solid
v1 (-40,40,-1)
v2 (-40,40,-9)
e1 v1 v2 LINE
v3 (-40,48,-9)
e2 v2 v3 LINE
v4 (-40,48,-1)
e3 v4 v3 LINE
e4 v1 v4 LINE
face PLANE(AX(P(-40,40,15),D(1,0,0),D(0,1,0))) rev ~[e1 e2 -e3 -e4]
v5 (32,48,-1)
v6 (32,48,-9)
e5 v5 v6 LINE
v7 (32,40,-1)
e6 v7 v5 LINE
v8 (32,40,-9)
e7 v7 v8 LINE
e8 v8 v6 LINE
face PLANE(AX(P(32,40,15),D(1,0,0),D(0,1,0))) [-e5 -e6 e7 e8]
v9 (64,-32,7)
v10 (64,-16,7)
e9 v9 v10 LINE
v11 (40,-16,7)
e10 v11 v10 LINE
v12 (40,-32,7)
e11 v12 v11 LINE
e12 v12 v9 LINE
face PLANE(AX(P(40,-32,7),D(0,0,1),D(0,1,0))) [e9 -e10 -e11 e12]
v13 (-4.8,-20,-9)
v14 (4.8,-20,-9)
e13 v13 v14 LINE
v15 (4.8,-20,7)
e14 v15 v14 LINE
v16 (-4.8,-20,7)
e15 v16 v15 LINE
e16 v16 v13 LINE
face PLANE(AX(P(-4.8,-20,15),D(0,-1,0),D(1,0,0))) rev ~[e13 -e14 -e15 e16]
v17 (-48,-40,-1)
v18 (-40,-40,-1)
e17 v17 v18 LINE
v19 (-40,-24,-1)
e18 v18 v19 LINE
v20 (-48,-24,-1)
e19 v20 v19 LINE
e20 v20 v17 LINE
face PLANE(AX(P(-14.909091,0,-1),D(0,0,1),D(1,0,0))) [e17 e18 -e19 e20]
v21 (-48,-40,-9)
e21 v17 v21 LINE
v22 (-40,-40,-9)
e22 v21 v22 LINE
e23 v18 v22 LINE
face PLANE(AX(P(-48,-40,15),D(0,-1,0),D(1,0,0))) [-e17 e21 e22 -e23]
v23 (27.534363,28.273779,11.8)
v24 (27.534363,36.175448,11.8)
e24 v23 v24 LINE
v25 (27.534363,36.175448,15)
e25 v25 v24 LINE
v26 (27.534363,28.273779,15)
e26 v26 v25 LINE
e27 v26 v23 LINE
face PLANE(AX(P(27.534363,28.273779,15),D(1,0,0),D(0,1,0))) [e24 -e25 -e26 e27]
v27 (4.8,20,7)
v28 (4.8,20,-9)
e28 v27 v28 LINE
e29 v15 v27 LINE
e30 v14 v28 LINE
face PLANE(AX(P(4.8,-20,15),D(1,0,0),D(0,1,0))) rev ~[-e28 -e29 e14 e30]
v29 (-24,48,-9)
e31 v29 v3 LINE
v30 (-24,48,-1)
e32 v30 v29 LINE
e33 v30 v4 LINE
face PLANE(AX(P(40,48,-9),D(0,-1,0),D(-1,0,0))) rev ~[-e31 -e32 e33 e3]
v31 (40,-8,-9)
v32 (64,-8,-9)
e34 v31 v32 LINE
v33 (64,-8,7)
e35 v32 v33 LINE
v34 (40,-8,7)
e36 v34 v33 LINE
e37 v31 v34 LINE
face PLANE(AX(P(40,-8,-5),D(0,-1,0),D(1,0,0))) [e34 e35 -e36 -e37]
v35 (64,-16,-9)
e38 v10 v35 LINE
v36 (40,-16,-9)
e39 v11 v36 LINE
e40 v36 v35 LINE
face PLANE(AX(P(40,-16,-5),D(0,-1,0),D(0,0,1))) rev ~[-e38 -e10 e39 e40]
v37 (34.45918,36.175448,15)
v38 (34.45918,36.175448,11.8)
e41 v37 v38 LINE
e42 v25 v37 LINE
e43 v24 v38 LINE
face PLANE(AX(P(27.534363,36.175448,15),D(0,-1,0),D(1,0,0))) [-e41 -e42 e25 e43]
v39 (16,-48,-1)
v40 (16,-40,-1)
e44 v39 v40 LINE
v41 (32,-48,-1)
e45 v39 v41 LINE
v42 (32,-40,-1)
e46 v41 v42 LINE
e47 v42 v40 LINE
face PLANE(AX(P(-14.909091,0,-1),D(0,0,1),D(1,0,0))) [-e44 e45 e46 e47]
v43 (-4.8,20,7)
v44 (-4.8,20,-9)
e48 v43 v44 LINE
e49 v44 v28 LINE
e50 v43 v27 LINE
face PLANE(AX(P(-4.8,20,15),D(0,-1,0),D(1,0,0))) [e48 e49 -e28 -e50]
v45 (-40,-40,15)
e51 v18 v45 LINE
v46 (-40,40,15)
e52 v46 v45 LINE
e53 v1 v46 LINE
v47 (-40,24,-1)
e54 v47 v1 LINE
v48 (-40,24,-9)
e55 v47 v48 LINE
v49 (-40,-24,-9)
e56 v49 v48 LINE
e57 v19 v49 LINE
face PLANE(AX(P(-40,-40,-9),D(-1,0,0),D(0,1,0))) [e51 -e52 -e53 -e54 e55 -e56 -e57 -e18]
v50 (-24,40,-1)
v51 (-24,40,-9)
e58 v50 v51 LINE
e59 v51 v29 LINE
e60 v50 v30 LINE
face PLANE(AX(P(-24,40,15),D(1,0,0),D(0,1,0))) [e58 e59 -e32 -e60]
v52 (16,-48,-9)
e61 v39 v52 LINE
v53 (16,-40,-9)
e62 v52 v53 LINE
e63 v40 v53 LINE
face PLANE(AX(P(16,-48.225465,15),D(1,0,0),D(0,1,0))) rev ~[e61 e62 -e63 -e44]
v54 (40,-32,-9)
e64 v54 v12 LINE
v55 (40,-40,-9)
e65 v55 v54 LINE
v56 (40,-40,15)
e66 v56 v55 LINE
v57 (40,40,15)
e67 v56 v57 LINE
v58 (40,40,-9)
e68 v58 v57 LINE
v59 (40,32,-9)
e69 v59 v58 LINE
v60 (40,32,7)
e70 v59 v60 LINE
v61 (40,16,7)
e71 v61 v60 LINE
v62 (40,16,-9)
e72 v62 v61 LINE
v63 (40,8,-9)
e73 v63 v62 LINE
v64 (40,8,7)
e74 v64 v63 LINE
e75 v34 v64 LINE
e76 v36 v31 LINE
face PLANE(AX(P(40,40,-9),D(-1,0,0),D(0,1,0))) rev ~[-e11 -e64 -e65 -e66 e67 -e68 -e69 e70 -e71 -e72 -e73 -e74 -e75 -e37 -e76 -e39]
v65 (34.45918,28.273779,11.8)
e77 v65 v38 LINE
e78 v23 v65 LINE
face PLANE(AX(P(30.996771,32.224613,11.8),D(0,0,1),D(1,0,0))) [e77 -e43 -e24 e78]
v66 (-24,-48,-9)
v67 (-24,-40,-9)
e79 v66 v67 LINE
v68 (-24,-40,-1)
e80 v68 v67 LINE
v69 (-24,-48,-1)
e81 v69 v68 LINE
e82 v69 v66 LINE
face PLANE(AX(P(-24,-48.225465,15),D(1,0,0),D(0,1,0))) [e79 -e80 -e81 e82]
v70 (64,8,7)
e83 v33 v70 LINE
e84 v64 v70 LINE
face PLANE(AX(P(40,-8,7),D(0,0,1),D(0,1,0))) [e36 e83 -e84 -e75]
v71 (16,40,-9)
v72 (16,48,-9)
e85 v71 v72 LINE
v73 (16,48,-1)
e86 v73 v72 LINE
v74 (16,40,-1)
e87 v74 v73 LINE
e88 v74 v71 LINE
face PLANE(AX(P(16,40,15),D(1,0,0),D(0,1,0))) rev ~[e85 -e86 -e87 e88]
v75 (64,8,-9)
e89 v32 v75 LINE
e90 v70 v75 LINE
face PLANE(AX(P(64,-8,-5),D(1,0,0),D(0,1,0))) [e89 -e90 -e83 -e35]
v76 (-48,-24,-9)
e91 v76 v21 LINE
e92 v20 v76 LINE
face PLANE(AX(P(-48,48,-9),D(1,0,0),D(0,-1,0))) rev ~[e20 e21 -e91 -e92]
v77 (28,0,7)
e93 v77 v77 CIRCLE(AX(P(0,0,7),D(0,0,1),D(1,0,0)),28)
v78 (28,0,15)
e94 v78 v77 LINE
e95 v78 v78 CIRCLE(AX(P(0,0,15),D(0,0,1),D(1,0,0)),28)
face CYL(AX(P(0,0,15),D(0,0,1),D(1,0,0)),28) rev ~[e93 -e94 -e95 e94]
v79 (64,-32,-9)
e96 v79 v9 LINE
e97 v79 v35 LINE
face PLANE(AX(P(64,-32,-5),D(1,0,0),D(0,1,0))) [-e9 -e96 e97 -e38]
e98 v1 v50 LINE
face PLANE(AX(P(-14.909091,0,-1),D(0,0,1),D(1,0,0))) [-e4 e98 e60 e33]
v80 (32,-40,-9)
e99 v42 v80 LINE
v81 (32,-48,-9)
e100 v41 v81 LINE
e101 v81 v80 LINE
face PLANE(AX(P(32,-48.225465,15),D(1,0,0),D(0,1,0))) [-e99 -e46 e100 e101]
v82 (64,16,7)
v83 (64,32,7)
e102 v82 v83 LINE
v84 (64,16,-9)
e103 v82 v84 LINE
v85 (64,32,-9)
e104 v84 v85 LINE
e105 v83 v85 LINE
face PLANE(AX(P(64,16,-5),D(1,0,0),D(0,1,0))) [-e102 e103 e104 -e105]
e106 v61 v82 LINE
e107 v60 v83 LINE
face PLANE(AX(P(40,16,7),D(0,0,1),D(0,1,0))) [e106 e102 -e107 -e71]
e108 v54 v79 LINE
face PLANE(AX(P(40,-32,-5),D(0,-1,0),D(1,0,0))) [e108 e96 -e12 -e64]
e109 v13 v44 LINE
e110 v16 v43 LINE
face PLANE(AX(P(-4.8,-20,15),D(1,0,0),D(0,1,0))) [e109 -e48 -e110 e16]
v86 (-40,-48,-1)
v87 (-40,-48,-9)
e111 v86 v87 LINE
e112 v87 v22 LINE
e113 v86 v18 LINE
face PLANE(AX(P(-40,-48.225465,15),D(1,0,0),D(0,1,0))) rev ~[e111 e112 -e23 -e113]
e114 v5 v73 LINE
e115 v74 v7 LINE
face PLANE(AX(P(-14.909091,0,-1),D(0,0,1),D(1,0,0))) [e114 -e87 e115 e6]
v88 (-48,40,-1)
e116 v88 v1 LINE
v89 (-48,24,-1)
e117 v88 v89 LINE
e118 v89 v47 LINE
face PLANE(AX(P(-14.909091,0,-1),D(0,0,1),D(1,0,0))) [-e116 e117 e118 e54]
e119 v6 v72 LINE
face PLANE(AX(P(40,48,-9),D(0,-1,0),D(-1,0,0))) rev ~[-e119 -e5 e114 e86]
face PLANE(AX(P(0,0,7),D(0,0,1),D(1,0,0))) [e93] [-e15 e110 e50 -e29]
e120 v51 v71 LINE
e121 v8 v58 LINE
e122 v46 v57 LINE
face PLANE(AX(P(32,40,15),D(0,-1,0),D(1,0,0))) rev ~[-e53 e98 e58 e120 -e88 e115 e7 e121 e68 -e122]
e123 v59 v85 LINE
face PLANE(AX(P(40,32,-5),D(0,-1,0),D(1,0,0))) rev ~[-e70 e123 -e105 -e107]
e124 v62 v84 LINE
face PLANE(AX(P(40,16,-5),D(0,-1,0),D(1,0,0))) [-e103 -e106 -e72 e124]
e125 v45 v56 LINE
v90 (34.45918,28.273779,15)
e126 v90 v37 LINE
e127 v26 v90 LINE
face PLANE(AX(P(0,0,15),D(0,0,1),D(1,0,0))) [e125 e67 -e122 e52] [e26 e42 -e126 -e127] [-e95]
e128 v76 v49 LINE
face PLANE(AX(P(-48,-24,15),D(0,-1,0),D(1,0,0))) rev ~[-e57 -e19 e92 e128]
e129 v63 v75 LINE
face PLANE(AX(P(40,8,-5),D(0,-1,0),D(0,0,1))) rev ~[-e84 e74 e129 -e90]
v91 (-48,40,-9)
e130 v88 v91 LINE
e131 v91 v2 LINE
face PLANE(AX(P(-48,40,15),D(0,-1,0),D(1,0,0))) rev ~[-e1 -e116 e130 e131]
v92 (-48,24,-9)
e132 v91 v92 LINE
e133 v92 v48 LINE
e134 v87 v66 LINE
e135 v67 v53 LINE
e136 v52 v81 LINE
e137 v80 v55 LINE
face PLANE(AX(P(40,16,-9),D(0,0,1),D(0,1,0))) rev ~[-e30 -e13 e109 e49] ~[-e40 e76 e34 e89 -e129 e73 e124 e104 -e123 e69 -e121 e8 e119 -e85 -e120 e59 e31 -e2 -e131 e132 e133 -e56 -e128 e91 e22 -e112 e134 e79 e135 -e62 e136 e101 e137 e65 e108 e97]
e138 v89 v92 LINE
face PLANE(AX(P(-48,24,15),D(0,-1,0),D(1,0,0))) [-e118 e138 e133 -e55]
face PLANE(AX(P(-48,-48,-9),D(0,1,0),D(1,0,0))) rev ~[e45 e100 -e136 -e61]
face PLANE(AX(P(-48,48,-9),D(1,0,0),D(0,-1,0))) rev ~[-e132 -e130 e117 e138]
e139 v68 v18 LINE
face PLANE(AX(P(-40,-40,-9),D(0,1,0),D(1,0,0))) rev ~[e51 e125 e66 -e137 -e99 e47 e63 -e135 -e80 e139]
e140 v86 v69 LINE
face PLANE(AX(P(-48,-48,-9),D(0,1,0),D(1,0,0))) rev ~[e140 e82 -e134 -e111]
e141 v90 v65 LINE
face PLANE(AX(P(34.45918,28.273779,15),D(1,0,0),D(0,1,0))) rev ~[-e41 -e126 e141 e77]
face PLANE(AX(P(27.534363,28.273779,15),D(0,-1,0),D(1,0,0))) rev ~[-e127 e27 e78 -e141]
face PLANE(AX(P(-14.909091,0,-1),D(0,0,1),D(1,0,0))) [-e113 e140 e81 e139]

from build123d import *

# Parameters (mm, degrees)
F0_W      = 50
F0_H      = 50
F1_DEPTH  = 15
F2_W      = 6
F2_H      = 25
F3_DEPTH  = 25
F4_W      = 10
F4_H      = 10
F5_DEPTH  = 30
F6_W      = 50
F6_H      = 20
F7_DEPTH  = 30
F9_DEPTH  = 50
F10_DEPTH = 5
F11_R     = 17.5
F11_W     = 6
F11_H     = 25
F12_DEPTH = 5
F11_W_2   = 25
F11_H_2   = 5.1409158856
F11_W_3   = 5
F11_H_3   = 5
F11_H_4   = 30
F13_DEPTH = 25
F14_W     = 6
F14_H     = 6
F15_DEPTH = 20
F16_DEPTH = 15
F11_W_4   = 4.3280106038
F11_H_5   = 4.9385428429
F17_DEPTH = 2
F18_W     = 60
F18_H     = 62
F19_DEPTH = 25
F20_SCALE = 1.6
F21_DEPTH = 4
F22_DEPTH = 4


with BuildPart() as f1:
    # F0 (on Top) → F1 (new body)
    with BuildSketch(Plane.XY):
        Rectangle(F0_W, F0_H)
    extrude(amount=F1_DEPTH)

    # F2 (on face) → F3 (cut)
    with BuildSketch(Plane.XY.offset(15)):
        Rectangle(F2_W, F2_H)
    extrude(amount=-F3_DEPTH, mode=Mode.SUBTRACT)

    # F4 (on face) → F5 (join)
    with BuildSketch(Plane.YZ.offset(25)):
        with Locations((0, 7.5)):
            Rectangle(F4_W, F4_H)
        with Locations((-15, 7.5)):
            Rectangle(F4_W, F4_H)
        with Locations((15, 7.5)):
            Rectangle(F4_W, F4_H)
    extrude(amount=F5_DEPTH)

    # F6 (on face) → F7 (join)
    with BuildSketch(Plane.YZ.offset(55)):
        with Locations((0, 7.5)):
            Rectangle(F6_W, F6_H)
    extrude(amount=F7_DEPTH)

    # F8 (on face) → F9 (cut)
    with BuildSketch(Plane(origin=(0, 25, 0), x_dir=(-1, 0, 0), z_dir=(0, 1, 0))):
        Polygon((-85, -2.5), (-70, 17.5), (-85, 17.5), align=None)
    extrude(amount=-F9_DEPTH, mode=Mode.SUBTRACT)

    # F0 (on Top) → F10 (join)
    with BuildSketch(Plane.XY):
        Polygon((-25, -25), (-25, 25), (25, 25), (25, 30), (-30, 30), (-30, -30), (25, -30), (25, -25), align=None)
    extrude(amount=F10_DEPTH)

    # F11 (on face) → F12 (cut)
    with BuildSketch(Plane.XY.offset(15)):
        Circle(F11_R)
        Rectangle(F11_W, F11_H, mode=Mode.SUBTRACT)
    extrude(amount=-F12_DEPTH, mode=Mode.SUBTRACT)

    # F11 (on face) → F13 (cut)
    with BuildSketch(Plane.XY.offset(15)):
        with Locations((-2.5, -27.5704579428)):
            Rectangle(F11_W_2, F11_H_2)
        with Locations((-27.5, -27.5704579428)):
            Rectangle(F11_W_3, F11_H_2)
        with Locations((22.5, -27.5704579428)):
            Rectangle(F11_W_3, F11_H_2)
        with Locations((22.5, 27.5)):
            Rectangle(F11_W_3, F11_H_3)
        with Locations((-2.5, 27.5)):
            Rectangle(F11_W_2, F11_H_3)
        with Locations((-27.5, 27.5)):
            Rectangle(F11_W_3, F11_H_3)
        with Locations((-27.5, 0)):
            Rectangle(F11_W_3, F11_H_4)
    extrude(amount=-F13_DEPTH, mode=Mode.SUBTRACT)

    # F14 (on face) → F15 (join)
    with BuildSketch(Plane.XY.offset(17.5)):
        with Locations((67, 28)):
            Rectangle(F14_W, F14_H)
        with Locations((67, -28)):
            Rectangle(F14_W, F14_H)
    extrude(amount=-F15_DEPTH)

    # F14 (on face) → F16 (cut)
    with BuildSketch(Plane.XY.offset(17.5)):
        with Locations((67, -28)):
            Rectangle(F14_W, F14_H)
        with Locations((67, 28)):
            Rectangle(F14_W, F14_H)
    extrude(amount=-F16_DEPTH, mode=Mode.SUBTRACT)

    # F11 (on face) → F17 (cut)
    with BuildSketch(Plane.XY.offset(15)):
        with Locations((19.372981973, 20.1403833926)):
            Rectangle(F11_W_4, F11_H_5)
    extrude(amount=-F17_DEPTH, mode=Mode.SUBTRACT)

    # F18 (on face) → F19 (cut)
    with BuildSketch(Plane.XY.offset(17.5)):
        with Locations((70, 0)):
            Rectangle(F18_W, F18_H)
    extrude(amount=-F19_DEPTH, mode=Mode.SUBTRACT)


with BuildPart() as f1_1:
    # F20: moved
    add(f1.part.scale(F20_SCALE).moved(Location((0, 0, -9))))

    # F21 (add): faces of the model
    f21_faces = [f1_1.faces().sort_by_distance(p)[0] for p in [
        (52, 24, -5),
        (52, 0, -5),
        (52, -24, -5),
    ]]
    extrude(f21_faces, amount=F21_DEPTH)

    # F22 (cut): faces of the model
    f22_faces = [f1_1.faces().sort_by_distance(p)[0] for p in [
        (52, 24, 11),
        (52, 0, 11),
        (52, -24, 11),
    ]]
    extrude(f22_faces, amount=-F22_DEPTH, mode=Mode.SUBTRACT)


solid = f1_1.part
